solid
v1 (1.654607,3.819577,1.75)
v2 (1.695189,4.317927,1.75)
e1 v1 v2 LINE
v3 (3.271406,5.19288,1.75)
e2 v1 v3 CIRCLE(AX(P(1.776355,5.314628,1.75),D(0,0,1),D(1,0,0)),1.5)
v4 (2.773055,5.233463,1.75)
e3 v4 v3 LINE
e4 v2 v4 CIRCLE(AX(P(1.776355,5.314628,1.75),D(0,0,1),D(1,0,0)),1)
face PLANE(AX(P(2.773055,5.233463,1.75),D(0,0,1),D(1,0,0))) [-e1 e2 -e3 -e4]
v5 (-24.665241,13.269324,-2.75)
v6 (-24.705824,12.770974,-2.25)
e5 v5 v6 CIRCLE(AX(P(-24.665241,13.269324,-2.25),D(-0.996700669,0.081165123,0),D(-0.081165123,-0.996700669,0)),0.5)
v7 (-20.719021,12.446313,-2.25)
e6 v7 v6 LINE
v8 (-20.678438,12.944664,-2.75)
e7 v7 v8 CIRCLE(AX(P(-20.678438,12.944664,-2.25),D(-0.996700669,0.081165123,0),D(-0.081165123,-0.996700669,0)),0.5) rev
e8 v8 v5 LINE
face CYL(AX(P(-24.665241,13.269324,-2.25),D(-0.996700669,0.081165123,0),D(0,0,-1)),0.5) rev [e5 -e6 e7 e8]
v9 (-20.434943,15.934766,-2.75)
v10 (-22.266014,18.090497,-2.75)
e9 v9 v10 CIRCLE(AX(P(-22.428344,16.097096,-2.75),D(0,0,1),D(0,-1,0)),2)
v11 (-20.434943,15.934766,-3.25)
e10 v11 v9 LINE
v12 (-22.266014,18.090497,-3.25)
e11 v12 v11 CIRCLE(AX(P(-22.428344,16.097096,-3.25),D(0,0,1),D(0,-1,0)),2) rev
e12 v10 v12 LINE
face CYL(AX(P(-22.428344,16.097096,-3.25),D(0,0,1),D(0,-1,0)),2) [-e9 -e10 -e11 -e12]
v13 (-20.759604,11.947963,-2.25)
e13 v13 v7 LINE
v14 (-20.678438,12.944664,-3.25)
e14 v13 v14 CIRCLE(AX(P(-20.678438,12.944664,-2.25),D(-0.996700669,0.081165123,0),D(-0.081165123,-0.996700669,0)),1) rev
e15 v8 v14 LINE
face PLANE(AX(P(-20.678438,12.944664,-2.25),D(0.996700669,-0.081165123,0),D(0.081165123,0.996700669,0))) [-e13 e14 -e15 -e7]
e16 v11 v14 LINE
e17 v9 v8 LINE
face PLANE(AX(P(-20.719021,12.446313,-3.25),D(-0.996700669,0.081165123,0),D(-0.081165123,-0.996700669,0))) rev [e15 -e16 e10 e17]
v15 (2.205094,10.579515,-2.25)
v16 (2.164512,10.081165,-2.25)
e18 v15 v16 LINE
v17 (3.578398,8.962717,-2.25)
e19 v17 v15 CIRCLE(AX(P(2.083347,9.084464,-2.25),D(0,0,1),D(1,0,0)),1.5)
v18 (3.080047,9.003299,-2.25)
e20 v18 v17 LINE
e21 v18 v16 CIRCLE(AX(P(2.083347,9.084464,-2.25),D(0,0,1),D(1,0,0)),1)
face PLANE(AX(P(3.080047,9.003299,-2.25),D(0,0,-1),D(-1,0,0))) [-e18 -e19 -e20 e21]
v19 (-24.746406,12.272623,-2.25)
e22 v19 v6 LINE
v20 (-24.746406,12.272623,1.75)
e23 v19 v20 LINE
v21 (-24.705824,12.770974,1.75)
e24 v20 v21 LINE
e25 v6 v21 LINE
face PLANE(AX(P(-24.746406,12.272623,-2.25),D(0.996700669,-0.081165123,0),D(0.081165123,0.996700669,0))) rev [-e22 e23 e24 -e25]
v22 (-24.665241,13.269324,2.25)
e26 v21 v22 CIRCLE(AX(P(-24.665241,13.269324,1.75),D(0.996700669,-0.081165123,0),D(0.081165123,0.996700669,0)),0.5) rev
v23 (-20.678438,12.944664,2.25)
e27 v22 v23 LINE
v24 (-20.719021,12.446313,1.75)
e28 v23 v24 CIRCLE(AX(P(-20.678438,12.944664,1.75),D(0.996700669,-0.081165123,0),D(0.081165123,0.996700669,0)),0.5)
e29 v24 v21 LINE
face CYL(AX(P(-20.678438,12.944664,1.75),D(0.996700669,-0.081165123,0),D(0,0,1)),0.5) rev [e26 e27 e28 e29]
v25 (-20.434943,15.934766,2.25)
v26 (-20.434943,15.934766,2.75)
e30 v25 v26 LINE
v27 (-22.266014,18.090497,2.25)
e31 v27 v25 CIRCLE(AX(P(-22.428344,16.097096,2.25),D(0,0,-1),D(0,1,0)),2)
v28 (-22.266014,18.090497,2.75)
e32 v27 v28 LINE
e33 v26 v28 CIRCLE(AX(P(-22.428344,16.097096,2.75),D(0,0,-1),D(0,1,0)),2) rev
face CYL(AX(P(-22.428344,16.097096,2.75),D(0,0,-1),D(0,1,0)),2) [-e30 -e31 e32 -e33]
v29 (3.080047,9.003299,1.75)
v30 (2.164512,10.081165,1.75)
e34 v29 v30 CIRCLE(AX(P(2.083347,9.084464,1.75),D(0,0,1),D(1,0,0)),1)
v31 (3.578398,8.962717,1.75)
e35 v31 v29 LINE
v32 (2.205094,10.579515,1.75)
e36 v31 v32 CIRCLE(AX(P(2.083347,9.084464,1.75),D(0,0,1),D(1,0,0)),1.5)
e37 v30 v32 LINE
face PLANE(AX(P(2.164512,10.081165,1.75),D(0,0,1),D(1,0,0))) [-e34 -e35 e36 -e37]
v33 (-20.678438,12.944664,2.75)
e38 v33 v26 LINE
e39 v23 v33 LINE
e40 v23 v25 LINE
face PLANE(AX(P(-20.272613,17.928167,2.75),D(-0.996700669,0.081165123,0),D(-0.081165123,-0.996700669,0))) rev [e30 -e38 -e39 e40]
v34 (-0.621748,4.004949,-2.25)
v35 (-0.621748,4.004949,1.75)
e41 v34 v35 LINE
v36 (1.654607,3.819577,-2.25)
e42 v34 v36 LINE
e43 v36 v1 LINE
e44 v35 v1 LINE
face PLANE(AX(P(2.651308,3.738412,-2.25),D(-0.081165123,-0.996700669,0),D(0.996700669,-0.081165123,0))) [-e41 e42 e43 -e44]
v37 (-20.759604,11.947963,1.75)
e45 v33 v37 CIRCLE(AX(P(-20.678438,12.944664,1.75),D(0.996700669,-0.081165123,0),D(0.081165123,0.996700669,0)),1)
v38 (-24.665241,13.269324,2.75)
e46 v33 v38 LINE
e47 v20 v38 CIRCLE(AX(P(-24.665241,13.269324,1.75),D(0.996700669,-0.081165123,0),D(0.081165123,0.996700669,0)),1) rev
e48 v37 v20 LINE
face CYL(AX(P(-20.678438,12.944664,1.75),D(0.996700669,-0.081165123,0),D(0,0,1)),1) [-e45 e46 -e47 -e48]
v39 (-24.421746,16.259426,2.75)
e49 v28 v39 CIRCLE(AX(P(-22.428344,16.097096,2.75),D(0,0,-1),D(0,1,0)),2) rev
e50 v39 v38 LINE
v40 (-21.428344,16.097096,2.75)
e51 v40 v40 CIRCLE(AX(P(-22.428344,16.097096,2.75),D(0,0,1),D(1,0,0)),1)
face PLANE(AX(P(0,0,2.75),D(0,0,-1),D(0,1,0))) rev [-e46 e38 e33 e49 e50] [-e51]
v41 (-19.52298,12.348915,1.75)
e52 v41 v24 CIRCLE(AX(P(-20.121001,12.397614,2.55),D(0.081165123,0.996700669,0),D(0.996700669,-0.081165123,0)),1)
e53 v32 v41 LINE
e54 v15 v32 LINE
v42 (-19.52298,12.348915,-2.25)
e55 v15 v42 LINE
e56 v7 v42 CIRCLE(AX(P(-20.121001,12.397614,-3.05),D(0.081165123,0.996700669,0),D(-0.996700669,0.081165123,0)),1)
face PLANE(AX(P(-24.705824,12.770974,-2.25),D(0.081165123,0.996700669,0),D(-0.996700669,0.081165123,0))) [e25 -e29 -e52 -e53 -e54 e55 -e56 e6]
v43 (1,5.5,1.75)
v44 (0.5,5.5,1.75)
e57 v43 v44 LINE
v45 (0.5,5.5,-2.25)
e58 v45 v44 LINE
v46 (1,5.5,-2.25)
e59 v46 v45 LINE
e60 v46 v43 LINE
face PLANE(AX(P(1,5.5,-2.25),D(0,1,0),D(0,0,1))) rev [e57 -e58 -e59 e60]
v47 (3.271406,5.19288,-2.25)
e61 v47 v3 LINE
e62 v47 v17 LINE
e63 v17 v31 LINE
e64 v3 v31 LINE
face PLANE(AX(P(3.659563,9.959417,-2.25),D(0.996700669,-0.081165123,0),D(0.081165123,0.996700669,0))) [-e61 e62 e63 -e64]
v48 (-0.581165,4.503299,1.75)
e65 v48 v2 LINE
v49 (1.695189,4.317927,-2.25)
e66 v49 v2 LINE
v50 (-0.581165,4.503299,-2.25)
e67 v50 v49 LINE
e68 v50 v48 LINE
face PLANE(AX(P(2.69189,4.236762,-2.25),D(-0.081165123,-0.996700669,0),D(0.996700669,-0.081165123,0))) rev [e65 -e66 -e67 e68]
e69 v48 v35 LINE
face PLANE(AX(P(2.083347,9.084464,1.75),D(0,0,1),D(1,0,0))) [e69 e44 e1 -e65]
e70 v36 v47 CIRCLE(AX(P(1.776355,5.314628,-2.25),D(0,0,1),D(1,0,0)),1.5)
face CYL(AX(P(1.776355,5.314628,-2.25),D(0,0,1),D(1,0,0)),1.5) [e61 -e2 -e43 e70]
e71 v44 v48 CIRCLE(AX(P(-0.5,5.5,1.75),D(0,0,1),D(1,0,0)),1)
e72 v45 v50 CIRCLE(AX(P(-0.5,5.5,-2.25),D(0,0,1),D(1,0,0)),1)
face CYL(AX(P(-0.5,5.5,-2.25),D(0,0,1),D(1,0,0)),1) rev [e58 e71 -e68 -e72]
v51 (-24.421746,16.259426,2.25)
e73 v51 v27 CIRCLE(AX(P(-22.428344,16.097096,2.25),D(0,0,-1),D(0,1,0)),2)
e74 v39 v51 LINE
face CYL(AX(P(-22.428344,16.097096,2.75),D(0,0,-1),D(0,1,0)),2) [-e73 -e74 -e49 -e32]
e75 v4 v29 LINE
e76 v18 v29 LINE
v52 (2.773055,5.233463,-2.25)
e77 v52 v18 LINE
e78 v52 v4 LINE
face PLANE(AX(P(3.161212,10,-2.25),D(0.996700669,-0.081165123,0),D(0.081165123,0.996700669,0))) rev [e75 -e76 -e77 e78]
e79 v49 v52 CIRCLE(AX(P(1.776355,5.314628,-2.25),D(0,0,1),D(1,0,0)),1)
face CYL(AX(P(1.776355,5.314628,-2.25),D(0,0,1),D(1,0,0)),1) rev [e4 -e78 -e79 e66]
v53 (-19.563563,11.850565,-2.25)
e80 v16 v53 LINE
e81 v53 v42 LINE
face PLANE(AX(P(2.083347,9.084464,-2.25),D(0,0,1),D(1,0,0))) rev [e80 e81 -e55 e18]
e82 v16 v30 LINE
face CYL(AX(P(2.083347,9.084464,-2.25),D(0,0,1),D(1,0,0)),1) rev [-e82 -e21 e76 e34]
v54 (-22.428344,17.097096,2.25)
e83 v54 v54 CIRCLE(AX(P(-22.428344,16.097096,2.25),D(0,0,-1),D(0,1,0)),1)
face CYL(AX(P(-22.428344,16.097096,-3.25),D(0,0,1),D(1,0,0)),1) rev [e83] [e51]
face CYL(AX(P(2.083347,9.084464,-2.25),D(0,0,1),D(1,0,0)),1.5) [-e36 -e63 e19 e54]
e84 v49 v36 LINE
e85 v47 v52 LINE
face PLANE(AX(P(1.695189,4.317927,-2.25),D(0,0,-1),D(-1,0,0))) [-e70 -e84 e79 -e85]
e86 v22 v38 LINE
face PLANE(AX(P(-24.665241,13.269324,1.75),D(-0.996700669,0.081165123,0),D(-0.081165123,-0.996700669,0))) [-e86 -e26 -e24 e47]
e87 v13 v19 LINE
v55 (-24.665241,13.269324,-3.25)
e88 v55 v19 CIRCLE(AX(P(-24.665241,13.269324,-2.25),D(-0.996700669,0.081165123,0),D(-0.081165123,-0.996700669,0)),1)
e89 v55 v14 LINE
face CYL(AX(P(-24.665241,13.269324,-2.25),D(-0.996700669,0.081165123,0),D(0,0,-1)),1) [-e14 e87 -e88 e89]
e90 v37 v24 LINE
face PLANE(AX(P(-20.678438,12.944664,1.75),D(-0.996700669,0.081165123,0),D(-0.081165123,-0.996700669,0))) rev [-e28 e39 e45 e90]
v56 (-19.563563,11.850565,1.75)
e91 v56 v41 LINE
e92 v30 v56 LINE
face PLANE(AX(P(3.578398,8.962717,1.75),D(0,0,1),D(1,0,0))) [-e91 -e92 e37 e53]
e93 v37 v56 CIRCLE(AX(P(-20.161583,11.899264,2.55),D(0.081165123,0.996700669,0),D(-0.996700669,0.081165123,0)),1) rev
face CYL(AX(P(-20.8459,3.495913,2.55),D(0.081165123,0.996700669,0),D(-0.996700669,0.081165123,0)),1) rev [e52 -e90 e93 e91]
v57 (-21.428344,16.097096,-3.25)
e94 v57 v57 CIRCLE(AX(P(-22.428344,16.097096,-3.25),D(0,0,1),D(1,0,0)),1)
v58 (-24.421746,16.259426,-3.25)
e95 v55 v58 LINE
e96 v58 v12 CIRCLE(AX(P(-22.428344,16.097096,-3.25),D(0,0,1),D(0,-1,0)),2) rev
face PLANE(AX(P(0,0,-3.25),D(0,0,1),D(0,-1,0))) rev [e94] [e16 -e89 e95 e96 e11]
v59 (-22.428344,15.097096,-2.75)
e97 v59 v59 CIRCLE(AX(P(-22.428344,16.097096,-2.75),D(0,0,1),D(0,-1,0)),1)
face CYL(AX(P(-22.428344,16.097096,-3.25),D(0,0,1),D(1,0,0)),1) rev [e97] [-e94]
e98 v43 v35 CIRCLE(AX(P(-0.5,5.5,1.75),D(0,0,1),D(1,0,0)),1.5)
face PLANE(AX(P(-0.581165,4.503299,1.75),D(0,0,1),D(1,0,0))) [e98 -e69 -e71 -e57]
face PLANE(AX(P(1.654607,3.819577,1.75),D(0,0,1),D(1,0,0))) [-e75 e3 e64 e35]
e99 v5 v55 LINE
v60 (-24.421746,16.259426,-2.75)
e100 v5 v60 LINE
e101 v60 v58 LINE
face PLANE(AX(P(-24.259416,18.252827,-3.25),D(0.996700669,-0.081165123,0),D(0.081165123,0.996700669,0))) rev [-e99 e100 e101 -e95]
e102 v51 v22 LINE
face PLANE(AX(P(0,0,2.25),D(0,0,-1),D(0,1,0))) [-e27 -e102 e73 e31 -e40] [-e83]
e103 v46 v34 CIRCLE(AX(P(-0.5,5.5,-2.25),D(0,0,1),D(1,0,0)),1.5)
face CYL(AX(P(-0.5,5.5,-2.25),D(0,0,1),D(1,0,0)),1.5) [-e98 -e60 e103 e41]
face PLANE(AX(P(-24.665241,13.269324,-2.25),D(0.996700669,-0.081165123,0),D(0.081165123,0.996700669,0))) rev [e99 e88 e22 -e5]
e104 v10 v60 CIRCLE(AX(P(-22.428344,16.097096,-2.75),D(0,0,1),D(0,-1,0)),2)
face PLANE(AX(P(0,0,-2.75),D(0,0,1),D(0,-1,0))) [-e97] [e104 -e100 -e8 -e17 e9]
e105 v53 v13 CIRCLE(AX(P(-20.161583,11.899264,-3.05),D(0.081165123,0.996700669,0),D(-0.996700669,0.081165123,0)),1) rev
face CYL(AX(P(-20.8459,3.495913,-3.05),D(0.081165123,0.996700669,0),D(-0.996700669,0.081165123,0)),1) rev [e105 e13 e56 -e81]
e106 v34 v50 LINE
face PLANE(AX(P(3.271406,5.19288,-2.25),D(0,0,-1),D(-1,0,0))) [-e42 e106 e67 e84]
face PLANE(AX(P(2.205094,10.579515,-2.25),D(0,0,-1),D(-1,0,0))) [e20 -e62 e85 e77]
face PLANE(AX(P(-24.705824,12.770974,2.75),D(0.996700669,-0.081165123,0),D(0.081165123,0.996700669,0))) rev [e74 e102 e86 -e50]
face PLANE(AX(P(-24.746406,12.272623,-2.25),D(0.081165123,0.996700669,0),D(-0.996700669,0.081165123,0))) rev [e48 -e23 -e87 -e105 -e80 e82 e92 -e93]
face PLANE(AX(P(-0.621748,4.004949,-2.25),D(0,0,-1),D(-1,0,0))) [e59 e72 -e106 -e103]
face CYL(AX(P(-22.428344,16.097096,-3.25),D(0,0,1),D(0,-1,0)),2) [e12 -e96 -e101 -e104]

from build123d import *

# Parameters (mm, degrees)
ODGI_CIE_BAZOWE1_DEPTH      = 1.75
ODGI_CIE_BAZOWE1_DEPTH_BACK = 2.25
WYTNIJ_WYCI_GNI_CIE1_REACH  = 28.618
ODGI_CIE_KRAW_DZI1_DEPTH    = 4
ODGI_CIE_KRAW_DZI2_DEPTH    = 4
SZKIC13_R                   = 1
WYTNIJ_WYCI_GNI_CIE2_DEPTH  = 32.329703674
ZAOKR_GLENIE1_R             = 2


# Sheet-metal steps are written as plain solids
with BuildPart() as part:
    # Szkic1 → Odgięcie bazowe1 (new, two sides: drawn at the far end of the back side and taken through both)
    with BuildSketch(Plane.XY.offset(-ODGI_CIE_BAZOWE1_DEPTH_BACK)):
        with BuildLine():
            Line((-24.746406247, 12.272623445), (2.164511805, 10.081165123))
            ThreePointArc((2.164511805, 10.081165123), (2.845512893, 9.731845847), (3.080047351, 9.003299331))
            Line((3.080047351, 9.003299331), (2.773055226, 5.233462675))
            ThreePointArc((2.773055226, 5.233462675), (2.42373595, 4.552461587), (1.695189434, 4.317927129))
            Line((1.695189434, 4.317927129), (-0.581165123, 4.503299331))
            ThreePointArc((-0.581165123, 4.503299331), (-1.177803392, 6.235243199), (0.5, 5.5))
            Line((0.5, 5.5), (1, 5.5))
            ThreePointArc((1, 5.5), (-1.516705088, 6.602864798), (-0.621747685, 4.004948997))
            Line((-0.621747685, 4.004948997), (1.654606873, 3.819576795))
            ThreePointArc((1.654606873, 3.819576795), (2.747426646, 4.171378482), (3.27140556, 5.192880113))
            Line((3.27140556, 5.192880113), (3.578397685, 8.96271677))
            ThreePointArc((3.578397685, 8.96271677), (3.226595998, 10.055536543), (2.205094367, 10.579515457))
            Line((2.205094367, 10.579515457), (-24.705823686, 12.77097378))
            Line((-24.705823686, 12.77097378), (-24.746406247, 12.272623445))
        make_face()
    extrude(amount=ODGI_CIE_BAZOWE1_DEPTH + ODGI_CIE_BAZOWE1_DEPTH_BACK)

    # Szkic6 → Wytnij-wyciągnięcie1 (cut, up to next)
    with BuildSketch(Plane(origin=(0.870381249, 10.688206219, 0), x_dir=(0.9967006686068912, -0.08116512304294364, 0), z_dir=(0.08116512304294363, 0.9967006686068911, 0)), mode=Mode.PRIVATE) as wytnij_wyci_gni_cie1_sk1:
        with BuildLine():
            Line((-20.460868644, -1.75), (-21.660868644, -1.75))
            ThreePointArc((-21.660868644, -1.75), (-21.060868644, -1.55), (-20.460868644, -1.75))
        make_face()
    wytnij_wyci_gni_cie1_tool1 = extrude(wytnij_wyci_gni_cie1_sk1.sketch, amount=-WYTNIJ_WYCI_GNI_CIE1_REACH, mode=Mode.PRIVATE) & part.part
    # Szkic6 → Wytnij-wyciągnięcie1 (cut, up to next)
    with BuildSketch(Plane(origin=(0.870381249, 10.688206219, 0), x_dir=(0.9967006686068912, -0.08116512304294364, 0), z_dir=(0.08116512304294363, 0.9967006686068911, 0)), mode=Mode.PRIVATE) as wytnij_wyci_gni_cie1_sk2:
        with BuildLine():
            Line((-20.460868644, 2.25), (-21.660868644, 2.25))
            ThreePointArc((-21.660868644, 2.25), (-21.060868644, 2.05), (-20.460868644, 2.25))
        make_face()
    wytnij_wyci_gni_cie1_tool2 = extrude(wytnij_wyci_gni_cie1_sk2.sketch, amount=-WYTNIJ_WYCI_GNI_CIE1_REACH, mode=Mode.PRIVATE) & part.part
    add(wytnij_wyci_gni_cie1_tool1.solids().sort_by_distance((-20.121001, 12.397614, 1.669272))[0], mode=Mode.SUBTRACT)
    add(wytnij_wyci_gni_cie1_tool2.solids().sort_by_distance((-20.121001, 12.397614, -2.169272))[0], mode=Mode.SUBTRACT)

    # Odgięcie krawędzi1 section (across the edge) → Odgięcie krawędzi1 (add)
    with BuildSketch(Plane(origin=(-24.705823686, 12.77097378, 2.25), x_dir=(0, 0, -1), z_dir=(0.9967006686068913, -0.08116512304294192, 0))):
        with BuildLine():
            Line((-0.5, 0.5), (-0.5, 5.5))
            Line((-0.5, 5.5), (0, 5.5))
            Line((0, 5.5), (0, 0.5))
            ThreePointArc((0, 0.5), (0.146446609, 0.146446609), (0.5, 0))
            Line((0.5, 0), (0.5, -0.5))
            ThreePointArc((0.5, -0.5), (-0.207106781, -0.207106781), (-0.5, 0.5))
        make_face()
    extrude(amount=ODGI_CIE_KRAW_DZI1_DEPTH)

    # Odgięcie krawędzi2 section (across the edge) → Odgięcie krawędzi2 (add)
    with BuildSketch(Plane(origin=(-20.719021011, 12.446313287, -2.75), x_dir=(0, 0, 1), z_dir=(-0.9967006686068913, 0.08116512304294192, 0))):
        with BuildLine():
            Line((-0.5, 0.5), (-0.5, 5.5))
            Line((-0.5, 5.5), (0, 5.5))
            Line((0, 5.5), (0, 0.5))
            ThreePointArc((0, 0.5), (0.146446609, 0.146446609), (0.5, 0))
            Line((0.5, 0), (0.5, -0.5))
            ThreePointArc((0.5, -0.5), (-0.207106781, -0.207106781), (-0.5, 0.5))
        make_face()
    extrude(amount=ODGI_CIE_KRAW_DZI2_DEPTH)

    # Szkic13 → Wytnij-wyciągnięcie2 (cut, through all)
    with BuildSketch(Plane.XY.offset(2.75)):
        with Locations((-22.428344418, 16.097095874)):
            Circle(SZKIC13_R)
    extrude(amount=-WYTNIJ_WYCI_GNI_CIE2_DEPTH, mode=Mode.SUBTRACT)

    # Zaokrąglenie1
    zaokr_glenie1_edges = [part.edges().sort_by_distance(p)[0] for p in [
        (-24.259415509, 18.252827457, -3),
        (-20.272612835, 17.928166965, -3),
        (-20.272612835, 17.928166965, 2.5),
        (-24.259415509, 18.252827457, 2.5),
    ]]
    fillet(zaokr_glenie1_edges, radius=ZAOKR_GLENIE1_R - 0.0001)  # a hair under: the kernel refuses the full size


solid = part.part
